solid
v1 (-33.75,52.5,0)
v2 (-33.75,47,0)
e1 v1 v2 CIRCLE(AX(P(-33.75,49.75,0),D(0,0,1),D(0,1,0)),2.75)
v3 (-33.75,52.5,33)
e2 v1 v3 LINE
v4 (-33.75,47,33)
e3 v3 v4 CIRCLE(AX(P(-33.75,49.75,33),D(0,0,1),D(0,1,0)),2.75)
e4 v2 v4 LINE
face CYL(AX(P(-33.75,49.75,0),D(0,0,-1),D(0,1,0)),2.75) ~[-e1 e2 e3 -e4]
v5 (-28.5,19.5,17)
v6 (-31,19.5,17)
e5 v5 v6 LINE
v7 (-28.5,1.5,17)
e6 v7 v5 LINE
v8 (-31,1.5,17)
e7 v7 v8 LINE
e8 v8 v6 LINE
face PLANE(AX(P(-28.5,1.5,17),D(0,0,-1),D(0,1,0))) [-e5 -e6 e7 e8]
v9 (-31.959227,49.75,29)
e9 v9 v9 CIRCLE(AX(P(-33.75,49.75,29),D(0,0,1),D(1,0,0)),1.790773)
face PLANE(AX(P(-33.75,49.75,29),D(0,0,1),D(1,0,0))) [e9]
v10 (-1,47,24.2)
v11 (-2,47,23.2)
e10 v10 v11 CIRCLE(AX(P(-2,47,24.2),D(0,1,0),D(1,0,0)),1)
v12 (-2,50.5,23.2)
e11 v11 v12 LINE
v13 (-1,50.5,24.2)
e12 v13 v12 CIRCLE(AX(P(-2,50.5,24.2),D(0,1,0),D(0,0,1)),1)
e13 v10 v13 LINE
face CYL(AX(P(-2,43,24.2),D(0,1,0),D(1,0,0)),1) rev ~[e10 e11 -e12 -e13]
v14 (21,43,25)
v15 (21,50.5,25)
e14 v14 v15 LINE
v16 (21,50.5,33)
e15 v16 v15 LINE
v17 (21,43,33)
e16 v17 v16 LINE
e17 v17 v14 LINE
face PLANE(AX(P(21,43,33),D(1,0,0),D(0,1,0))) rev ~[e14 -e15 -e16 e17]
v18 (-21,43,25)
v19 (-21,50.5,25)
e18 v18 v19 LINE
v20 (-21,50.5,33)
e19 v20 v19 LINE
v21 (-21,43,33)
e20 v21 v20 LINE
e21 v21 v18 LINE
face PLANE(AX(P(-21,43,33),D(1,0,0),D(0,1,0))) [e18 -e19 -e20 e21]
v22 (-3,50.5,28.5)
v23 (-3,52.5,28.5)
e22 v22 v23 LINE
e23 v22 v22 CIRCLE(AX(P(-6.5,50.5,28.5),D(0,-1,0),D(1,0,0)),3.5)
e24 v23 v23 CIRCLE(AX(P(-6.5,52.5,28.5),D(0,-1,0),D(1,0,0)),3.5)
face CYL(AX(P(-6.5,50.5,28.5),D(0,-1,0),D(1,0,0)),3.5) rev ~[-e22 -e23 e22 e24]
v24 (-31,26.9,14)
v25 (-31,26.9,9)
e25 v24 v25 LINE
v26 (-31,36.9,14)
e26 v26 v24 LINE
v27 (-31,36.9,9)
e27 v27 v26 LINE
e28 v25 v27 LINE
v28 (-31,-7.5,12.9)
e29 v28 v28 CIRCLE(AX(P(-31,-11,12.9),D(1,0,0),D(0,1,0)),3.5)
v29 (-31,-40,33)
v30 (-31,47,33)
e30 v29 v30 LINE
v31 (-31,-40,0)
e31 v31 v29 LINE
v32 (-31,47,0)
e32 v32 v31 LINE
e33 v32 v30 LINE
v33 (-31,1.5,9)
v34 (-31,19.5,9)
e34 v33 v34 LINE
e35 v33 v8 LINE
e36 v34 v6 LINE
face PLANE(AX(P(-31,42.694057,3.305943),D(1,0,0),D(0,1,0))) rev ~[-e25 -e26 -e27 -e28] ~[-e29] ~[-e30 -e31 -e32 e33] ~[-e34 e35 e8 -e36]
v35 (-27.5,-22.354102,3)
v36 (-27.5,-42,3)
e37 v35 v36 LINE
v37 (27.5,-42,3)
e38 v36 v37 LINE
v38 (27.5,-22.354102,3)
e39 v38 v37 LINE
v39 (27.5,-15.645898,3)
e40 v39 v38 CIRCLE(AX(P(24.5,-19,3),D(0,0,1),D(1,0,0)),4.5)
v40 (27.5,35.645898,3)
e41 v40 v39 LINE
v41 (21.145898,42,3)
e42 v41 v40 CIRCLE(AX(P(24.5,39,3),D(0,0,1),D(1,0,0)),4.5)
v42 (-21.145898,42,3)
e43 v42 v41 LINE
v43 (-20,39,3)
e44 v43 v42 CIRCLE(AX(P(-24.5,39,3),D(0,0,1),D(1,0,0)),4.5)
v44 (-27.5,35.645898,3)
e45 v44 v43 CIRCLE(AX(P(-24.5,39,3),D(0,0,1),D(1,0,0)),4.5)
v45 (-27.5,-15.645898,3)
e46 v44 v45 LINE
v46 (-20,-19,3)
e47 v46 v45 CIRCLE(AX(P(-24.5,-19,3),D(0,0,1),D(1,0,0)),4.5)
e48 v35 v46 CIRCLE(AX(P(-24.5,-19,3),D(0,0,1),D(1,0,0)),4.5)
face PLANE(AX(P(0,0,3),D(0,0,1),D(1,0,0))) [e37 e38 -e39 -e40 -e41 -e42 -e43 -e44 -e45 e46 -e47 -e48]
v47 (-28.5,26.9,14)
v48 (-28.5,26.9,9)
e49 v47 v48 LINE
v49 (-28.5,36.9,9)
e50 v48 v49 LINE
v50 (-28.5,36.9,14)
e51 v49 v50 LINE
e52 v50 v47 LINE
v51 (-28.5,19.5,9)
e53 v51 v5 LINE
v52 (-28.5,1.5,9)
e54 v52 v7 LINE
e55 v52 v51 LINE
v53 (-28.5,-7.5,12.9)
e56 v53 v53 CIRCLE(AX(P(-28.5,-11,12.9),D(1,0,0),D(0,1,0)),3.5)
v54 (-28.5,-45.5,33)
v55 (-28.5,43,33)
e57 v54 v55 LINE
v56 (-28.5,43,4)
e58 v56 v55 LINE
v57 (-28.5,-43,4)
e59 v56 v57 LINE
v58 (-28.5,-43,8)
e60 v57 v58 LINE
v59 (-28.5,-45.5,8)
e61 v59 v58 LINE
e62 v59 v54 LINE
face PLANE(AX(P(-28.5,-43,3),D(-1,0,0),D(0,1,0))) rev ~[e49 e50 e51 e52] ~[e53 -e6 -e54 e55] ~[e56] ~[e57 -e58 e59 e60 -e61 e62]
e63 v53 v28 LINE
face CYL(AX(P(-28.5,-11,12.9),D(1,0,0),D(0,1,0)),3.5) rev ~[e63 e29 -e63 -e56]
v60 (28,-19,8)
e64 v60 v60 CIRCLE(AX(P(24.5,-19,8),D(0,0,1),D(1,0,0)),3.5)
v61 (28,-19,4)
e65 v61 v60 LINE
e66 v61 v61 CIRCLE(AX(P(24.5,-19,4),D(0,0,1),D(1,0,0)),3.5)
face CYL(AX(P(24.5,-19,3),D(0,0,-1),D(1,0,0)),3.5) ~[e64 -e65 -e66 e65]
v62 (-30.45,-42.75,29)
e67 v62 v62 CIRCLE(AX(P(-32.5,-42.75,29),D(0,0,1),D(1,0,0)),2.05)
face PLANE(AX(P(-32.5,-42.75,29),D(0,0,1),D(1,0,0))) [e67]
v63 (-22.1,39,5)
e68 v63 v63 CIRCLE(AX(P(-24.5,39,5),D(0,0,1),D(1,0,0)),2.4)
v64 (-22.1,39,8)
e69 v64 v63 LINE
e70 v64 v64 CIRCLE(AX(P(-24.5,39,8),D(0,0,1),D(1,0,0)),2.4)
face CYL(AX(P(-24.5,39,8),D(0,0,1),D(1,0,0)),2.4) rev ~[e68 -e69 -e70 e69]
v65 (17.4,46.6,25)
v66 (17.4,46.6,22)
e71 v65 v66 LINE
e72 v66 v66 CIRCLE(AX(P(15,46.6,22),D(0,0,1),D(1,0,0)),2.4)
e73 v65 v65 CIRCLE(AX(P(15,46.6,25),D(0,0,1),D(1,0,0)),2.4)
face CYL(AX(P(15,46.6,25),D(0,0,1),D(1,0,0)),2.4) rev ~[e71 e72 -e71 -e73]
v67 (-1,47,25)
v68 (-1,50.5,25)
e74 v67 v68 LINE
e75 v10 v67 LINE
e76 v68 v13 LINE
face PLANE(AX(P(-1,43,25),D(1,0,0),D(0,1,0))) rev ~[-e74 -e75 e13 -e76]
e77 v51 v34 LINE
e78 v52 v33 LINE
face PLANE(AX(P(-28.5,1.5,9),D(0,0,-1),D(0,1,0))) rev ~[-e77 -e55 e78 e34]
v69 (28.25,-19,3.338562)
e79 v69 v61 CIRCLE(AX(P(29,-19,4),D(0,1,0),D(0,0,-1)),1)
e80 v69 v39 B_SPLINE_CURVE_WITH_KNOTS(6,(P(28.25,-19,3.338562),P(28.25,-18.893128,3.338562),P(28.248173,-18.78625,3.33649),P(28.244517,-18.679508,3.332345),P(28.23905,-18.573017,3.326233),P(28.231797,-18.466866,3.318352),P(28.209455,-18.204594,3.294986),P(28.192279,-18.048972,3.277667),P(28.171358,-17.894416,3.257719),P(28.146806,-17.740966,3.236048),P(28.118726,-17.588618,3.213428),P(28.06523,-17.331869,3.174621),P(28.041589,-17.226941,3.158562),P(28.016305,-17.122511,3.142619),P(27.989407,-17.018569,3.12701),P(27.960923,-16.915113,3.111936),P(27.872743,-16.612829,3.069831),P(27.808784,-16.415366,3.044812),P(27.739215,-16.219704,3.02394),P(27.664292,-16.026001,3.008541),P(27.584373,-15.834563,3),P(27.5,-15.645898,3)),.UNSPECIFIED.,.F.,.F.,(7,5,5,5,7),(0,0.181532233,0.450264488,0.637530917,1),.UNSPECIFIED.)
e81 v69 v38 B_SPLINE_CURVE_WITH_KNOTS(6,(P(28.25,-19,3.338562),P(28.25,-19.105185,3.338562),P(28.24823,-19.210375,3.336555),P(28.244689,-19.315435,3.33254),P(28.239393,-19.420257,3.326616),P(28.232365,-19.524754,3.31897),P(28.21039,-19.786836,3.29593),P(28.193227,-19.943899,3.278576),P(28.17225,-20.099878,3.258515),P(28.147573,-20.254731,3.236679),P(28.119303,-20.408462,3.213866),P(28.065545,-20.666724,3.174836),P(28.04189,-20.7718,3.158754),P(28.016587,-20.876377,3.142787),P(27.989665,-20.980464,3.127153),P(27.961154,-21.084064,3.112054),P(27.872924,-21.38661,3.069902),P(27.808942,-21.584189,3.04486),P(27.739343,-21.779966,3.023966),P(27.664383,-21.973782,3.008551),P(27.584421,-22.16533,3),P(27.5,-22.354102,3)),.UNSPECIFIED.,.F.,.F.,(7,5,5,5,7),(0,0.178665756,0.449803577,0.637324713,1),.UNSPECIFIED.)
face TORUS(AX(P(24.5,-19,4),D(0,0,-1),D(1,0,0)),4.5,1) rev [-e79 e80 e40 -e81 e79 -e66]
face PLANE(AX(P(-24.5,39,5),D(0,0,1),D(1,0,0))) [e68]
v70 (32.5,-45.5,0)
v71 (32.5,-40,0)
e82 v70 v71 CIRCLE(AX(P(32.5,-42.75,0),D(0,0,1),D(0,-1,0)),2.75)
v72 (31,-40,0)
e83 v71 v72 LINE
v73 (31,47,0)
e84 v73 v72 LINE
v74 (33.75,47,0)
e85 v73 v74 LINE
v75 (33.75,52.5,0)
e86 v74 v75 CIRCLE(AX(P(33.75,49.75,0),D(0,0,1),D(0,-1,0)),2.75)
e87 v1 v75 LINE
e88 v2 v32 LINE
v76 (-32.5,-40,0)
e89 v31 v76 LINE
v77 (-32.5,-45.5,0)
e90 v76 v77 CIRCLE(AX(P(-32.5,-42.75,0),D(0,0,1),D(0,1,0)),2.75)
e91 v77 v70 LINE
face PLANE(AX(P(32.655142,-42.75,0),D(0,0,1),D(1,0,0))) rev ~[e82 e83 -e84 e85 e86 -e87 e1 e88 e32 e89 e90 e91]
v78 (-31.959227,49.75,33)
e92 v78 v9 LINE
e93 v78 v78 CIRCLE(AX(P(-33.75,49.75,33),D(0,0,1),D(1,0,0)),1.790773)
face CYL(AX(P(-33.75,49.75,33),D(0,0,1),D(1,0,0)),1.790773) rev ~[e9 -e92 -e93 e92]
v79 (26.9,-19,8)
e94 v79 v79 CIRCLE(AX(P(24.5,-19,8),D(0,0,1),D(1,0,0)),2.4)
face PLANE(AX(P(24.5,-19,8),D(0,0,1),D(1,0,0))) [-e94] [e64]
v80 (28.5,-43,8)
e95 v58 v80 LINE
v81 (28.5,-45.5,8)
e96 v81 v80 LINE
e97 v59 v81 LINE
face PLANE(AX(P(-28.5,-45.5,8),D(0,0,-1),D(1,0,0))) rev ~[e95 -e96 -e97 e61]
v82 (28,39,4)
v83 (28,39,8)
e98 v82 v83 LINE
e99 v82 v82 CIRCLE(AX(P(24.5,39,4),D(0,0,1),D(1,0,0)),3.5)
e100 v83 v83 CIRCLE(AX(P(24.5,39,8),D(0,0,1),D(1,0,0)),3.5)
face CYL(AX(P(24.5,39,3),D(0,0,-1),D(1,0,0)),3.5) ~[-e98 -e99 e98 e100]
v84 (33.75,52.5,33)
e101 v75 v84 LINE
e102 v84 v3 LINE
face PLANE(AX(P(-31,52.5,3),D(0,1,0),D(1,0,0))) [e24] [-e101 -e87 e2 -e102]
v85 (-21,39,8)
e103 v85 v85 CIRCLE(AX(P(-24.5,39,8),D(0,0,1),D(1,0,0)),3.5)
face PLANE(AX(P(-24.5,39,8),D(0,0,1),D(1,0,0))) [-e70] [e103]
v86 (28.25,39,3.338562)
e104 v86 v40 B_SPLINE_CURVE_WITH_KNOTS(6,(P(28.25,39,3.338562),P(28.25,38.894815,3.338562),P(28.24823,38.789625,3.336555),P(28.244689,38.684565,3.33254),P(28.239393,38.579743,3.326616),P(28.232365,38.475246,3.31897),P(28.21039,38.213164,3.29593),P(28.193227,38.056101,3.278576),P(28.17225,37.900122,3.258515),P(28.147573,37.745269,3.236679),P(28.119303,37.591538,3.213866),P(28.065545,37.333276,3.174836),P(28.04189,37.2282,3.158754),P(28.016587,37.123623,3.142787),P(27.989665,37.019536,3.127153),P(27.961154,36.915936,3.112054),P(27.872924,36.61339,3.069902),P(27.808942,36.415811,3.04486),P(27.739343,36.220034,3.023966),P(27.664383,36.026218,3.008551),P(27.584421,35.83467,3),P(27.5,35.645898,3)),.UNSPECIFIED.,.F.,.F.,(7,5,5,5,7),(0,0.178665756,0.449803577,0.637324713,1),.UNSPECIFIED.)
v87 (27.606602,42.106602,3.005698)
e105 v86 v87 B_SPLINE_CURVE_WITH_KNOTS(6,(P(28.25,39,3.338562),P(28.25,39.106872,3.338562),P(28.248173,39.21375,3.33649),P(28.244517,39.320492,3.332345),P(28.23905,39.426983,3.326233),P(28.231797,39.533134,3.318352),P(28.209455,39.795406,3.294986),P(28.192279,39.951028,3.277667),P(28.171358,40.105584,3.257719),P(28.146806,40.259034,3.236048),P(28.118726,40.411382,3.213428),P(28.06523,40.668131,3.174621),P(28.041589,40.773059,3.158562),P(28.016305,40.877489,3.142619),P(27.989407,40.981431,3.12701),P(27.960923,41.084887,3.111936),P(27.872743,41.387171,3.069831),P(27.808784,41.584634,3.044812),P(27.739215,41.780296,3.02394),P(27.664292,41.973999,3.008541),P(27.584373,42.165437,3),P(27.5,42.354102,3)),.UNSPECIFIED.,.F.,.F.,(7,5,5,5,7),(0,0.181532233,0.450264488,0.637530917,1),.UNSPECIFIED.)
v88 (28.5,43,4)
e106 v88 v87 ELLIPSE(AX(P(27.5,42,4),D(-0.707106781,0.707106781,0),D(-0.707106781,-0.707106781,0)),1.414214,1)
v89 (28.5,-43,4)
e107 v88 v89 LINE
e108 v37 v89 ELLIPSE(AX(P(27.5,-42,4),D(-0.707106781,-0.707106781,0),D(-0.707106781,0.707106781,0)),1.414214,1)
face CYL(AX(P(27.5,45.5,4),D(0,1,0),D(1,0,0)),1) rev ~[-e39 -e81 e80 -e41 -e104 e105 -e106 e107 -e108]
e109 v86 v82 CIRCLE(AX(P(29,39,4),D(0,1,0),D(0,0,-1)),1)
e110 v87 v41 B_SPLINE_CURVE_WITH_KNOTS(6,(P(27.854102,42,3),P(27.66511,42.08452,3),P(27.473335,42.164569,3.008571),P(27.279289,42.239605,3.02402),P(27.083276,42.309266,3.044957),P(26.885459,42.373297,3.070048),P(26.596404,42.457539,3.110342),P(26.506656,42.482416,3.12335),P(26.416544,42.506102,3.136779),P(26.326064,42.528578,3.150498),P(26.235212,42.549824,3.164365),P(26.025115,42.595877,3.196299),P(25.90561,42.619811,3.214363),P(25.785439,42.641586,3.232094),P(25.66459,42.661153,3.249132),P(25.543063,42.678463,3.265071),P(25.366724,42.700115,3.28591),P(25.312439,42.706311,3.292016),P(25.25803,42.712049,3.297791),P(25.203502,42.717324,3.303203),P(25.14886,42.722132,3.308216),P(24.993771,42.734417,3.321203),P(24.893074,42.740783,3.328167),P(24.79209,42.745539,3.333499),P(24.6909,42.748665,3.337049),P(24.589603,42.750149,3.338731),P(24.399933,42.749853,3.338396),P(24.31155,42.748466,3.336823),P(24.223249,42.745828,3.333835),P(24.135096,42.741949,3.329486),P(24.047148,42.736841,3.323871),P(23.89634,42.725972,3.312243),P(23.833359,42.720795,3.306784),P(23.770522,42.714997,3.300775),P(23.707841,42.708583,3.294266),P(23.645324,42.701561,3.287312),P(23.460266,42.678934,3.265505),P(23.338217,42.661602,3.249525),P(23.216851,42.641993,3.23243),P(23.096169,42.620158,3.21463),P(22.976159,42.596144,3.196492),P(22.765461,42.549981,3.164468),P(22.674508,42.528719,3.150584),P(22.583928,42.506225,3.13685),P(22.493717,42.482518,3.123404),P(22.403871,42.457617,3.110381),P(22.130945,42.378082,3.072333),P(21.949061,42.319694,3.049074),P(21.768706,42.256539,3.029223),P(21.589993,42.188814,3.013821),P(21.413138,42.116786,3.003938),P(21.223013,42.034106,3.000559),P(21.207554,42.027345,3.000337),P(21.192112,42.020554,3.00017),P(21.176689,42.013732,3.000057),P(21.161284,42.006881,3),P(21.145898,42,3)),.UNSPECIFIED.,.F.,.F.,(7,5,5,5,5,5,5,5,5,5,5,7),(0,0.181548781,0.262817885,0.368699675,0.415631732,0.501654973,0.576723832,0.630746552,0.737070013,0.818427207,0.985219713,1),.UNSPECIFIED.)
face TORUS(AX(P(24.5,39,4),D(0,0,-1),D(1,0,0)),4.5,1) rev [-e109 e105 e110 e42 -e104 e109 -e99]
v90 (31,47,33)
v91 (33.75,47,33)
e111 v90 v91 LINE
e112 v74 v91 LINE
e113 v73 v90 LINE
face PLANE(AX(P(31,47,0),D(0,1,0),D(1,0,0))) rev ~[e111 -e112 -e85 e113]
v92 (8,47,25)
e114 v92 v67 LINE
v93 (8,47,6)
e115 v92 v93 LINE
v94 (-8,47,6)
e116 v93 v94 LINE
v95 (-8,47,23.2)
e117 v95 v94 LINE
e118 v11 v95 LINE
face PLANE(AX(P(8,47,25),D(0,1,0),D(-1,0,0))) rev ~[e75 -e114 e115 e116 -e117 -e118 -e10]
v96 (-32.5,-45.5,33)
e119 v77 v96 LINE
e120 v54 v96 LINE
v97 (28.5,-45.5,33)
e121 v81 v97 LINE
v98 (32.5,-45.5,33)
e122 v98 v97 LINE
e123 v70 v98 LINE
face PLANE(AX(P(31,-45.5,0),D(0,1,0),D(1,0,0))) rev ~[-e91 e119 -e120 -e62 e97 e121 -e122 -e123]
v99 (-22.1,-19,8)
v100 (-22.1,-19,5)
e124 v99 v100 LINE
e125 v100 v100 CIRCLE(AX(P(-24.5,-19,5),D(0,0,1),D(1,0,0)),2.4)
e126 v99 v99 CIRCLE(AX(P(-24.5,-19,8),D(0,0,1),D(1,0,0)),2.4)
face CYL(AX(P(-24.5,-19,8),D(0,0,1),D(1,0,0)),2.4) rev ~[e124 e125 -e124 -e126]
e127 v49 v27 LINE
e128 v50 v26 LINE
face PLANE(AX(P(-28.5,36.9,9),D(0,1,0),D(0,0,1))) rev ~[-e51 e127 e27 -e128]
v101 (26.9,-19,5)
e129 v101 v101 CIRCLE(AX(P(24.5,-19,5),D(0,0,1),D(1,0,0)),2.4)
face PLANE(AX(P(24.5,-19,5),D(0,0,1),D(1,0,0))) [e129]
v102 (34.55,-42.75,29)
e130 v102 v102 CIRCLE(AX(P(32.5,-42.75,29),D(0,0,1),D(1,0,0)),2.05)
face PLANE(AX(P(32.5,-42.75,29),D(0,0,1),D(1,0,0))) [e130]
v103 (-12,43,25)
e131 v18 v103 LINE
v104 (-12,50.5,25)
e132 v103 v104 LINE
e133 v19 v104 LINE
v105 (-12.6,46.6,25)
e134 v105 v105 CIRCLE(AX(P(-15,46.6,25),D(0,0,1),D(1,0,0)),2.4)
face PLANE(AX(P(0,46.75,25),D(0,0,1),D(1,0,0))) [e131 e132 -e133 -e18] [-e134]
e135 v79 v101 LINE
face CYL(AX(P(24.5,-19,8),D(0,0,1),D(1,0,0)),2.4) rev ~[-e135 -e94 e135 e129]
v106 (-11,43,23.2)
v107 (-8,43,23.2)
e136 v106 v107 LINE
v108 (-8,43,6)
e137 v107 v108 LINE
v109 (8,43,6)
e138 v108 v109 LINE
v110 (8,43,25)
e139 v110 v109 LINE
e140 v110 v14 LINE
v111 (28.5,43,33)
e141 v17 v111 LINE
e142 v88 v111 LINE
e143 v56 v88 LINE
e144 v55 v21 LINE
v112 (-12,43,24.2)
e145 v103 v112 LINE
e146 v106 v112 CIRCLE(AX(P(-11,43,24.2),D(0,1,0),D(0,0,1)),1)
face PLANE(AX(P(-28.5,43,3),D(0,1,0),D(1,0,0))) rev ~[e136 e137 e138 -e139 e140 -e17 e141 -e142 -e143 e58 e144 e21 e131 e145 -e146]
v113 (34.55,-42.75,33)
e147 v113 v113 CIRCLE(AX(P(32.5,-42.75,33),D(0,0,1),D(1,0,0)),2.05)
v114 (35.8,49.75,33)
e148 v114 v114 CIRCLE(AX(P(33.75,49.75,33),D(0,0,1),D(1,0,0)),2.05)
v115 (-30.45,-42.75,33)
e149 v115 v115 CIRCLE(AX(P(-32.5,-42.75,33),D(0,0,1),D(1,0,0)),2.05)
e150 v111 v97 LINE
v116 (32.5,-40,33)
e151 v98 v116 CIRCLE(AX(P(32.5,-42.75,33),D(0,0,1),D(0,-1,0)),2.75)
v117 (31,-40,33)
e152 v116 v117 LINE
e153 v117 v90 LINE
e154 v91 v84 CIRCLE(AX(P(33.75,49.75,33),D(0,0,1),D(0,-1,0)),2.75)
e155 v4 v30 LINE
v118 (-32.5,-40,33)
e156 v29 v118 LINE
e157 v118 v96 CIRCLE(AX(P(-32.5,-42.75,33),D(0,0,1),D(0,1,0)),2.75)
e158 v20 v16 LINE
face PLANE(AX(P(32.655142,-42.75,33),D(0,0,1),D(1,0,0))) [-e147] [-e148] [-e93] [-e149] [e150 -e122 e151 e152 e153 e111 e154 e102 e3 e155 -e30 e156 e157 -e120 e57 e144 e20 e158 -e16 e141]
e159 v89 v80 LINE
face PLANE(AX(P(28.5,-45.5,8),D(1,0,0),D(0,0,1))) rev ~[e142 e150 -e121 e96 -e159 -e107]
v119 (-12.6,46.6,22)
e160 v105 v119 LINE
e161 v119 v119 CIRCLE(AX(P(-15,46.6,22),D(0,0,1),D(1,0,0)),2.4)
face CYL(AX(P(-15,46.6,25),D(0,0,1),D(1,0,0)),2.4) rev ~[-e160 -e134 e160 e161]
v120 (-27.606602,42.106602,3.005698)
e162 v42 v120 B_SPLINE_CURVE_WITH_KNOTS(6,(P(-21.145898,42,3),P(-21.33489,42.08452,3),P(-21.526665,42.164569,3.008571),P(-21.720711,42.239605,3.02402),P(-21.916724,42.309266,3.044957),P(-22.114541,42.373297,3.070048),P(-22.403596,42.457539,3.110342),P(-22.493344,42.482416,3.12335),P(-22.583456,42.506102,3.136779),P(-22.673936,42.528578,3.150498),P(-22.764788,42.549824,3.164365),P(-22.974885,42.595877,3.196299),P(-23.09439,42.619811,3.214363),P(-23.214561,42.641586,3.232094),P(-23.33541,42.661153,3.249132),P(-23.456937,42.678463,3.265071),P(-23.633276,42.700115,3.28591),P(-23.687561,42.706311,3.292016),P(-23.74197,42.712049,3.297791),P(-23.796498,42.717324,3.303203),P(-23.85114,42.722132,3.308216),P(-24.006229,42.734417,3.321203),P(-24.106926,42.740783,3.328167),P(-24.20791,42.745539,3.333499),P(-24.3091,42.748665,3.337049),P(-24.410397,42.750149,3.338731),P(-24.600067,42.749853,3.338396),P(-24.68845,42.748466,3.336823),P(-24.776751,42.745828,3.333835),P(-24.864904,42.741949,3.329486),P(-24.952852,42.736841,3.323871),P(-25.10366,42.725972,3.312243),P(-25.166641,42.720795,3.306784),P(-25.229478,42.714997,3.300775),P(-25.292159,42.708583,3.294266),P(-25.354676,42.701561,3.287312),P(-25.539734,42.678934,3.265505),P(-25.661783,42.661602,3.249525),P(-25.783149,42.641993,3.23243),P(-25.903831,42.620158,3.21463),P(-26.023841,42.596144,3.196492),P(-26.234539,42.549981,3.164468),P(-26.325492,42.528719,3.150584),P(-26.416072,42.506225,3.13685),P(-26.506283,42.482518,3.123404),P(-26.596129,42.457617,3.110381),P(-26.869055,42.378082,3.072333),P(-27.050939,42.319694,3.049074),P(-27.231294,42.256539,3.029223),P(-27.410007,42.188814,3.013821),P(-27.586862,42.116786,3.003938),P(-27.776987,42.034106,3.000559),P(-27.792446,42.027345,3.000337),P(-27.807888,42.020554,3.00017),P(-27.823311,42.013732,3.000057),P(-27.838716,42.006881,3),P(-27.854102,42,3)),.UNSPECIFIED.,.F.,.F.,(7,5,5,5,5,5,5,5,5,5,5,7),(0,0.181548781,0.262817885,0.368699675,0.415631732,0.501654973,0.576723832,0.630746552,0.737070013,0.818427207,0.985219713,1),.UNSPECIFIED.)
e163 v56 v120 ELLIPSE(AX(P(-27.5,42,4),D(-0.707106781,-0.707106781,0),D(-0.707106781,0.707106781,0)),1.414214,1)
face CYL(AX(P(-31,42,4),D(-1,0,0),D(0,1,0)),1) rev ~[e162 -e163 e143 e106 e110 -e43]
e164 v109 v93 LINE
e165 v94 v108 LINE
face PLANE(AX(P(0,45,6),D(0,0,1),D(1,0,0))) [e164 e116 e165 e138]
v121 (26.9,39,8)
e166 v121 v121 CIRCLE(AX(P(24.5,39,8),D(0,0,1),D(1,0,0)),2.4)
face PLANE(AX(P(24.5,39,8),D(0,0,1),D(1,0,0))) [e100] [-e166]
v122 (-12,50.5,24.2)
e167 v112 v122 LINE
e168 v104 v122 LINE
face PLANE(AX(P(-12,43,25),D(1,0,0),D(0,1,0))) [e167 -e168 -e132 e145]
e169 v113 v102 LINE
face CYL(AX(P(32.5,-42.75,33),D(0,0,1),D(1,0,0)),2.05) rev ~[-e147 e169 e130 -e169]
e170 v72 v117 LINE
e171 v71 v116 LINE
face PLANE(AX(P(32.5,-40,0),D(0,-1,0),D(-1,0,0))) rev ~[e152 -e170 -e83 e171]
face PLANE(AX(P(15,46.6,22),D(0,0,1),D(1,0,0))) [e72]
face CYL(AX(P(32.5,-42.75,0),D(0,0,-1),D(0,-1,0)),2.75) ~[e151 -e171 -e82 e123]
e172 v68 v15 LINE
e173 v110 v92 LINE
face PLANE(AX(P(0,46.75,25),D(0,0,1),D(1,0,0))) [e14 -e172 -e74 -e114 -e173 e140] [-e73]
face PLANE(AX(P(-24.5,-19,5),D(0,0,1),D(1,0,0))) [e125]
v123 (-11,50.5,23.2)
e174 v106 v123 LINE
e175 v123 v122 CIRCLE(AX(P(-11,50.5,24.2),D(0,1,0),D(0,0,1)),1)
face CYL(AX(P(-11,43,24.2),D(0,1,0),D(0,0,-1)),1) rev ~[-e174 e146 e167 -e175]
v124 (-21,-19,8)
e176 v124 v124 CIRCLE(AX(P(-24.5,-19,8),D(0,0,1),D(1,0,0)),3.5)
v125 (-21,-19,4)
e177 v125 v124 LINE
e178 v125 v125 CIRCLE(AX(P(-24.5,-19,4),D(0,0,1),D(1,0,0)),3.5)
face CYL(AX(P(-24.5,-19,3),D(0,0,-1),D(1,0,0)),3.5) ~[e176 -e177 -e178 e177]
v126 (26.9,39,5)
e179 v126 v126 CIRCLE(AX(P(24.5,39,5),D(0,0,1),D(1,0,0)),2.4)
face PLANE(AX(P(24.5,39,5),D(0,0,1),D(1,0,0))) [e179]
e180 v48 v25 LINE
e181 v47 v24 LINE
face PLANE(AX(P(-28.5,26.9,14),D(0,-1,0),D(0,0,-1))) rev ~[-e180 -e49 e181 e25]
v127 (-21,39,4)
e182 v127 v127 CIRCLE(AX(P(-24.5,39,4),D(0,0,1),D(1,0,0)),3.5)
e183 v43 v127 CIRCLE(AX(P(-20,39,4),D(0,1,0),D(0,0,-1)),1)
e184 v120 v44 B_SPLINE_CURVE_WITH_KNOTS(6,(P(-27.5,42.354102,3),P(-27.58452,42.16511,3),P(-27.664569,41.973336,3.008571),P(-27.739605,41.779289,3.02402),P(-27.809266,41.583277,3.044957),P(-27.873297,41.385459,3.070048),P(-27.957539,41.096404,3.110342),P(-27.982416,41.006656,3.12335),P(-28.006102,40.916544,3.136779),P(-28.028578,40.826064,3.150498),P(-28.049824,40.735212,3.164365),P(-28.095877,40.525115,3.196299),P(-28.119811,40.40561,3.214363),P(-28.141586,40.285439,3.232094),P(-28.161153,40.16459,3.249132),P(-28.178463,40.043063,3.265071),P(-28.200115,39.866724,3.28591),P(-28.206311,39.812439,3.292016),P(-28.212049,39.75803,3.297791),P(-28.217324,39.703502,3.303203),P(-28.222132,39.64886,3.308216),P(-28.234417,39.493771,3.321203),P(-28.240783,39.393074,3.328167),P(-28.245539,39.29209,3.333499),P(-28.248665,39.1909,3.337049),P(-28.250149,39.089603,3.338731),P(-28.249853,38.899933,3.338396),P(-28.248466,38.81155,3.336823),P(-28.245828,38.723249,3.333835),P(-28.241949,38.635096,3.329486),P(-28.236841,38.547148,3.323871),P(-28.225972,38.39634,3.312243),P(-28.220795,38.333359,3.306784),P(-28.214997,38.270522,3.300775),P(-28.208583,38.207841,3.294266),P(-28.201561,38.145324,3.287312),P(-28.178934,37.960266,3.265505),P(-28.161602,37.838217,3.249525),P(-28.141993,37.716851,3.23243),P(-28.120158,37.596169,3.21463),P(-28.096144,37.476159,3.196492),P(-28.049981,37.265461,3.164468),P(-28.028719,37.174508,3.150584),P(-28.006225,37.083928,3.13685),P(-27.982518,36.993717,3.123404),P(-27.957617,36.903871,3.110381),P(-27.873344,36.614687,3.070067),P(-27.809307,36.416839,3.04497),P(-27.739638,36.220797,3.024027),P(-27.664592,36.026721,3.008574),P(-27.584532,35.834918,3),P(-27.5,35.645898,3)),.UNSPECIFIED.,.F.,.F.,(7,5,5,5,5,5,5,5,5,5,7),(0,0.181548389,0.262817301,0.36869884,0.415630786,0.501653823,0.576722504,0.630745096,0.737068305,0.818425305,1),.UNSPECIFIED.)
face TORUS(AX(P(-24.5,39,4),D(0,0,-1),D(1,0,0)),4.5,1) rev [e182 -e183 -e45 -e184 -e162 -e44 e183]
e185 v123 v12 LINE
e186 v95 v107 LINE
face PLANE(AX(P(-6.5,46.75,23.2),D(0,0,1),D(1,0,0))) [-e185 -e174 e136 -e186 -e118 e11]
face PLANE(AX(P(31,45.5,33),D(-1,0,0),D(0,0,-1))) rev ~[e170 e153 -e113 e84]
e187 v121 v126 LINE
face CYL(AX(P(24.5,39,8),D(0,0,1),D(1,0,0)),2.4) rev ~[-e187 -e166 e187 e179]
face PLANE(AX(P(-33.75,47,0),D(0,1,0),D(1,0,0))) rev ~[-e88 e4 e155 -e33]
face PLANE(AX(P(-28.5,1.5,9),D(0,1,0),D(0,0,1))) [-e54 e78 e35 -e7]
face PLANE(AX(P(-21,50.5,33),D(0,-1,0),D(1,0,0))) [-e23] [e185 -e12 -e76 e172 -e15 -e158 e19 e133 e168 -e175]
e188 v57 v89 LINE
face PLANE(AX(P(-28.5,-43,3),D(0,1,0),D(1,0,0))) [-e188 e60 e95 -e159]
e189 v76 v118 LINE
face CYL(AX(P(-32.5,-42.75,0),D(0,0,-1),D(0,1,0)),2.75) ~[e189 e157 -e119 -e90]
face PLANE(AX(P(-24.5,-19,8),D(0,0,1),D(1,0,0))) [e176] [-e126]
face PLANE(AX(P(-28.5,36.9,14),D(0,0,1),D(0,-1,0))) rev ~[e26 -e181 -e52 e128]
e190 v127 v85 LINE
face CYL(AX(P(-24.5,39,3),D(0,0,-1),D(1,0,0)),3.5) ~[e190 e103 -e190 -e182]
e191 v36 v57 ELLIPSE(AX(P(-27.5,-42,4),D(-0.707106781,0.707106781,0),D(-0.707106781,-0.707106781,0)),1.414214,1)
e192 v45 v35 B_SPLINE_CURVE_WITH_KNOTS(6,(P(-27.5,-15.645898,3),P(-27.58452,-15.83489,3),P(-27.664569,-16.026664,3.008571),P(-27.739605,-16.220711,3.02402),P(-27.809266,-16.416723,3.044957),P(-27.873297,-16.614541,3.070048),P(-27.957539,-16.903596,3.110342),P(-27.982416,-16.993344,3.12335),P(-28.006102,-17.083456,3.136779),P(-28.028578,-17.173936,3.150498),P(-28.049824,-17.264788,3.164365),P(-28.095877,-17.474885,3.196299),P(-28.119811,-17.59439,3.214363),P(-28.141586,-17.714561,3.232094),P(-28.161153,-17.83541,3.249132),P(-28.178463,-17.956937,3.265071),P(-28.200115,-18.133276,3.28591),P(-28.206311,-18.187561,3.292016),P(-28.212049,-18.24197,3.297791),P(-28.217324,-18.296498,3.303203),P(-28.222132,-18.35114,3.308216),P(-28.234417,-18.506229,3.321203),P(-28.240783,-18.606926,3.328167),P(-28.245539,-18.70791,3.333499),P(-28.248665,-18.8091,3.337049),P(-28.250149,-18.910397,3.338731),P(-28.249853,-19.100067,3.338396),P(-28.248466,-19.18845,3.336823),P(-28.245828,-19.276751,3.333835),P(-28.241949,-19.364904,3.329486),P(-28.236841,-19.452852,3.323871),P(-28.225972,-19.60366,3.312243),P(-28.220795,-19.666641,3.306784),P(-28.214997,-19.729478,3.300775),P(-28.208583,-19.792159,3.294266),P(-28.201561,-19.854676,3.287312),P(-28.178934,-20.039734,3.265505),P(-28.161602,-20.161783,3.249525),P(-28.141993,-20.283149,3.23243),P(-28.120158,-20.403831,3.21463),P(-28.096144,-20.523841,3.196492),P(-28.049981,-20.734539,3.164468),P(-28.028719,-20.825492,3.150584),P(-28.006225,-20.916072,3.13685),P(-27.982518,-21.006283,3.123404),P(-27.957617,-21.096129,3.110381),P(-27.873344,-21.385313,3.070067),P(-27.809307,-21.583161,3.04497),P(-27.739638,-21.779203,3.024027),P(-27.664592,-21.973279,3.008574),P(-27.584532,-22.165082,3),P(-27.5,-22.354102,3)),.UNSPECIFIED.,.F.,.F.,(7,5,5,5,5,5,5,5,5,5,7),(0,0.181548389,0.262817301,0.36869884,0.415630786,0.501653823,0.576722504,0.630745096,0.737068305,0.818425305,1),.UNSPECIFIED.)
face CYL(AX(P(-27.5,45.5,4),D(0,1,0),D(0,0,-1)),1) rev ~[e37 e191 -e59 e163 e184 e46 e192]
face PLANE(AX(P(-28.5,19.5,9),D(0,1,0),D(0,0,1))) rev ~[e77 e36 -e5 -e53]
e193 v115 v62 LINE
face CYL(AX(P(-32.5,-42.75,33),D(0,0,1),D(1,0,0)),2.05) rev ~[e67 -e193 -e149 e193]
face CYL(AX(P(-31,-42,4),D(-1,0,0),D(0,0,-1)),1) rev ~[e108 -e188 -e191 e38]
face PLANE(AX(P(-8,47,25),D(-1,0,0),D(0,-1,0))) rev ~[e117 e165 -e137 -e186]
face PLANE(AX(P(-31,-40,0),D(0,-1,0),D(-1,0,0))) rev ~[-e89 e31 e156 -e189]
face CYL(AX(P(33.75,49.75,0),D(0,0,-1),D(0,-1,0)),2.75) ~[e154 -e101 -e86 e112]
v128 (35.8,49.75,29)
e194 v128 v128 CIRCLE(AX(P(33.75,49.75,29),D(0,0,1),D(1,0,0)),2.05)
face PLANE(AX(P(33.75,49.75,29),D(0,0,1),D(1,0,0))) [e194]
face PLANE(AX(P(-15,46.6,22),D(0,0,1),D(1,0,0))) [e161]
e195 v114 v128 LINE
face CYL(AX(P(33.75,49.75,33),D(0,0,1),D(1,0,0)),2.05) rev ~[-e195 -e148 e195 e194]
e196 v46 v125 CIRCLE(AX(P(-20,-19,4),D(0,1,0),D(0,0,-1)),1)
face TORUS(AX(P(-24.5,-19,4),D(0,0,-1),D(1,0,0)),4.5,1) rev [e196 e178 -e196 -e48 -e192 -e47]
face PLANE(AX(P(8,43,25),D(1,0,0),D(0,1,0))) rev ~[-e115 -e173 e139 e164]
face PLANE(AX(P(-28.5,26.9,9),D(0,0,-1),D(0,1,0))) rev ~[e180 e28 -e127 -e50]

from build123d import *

# Parameters (mm, degrees)
F0_W         = 62
F0_H         = 91
F1_DEPTH     = 3
F2_W         = 62
F2_H         = 91
F2_W_2       = 57
F2_H_2       = 86
F3_DEPTH     = 30
F4_R         = 3.5
F5_DEPTH     = 5
F6_R         = 2.4
F7_DEPTH     = 3
F8_W         = 57
F8_H         = 25
F9_DEPTH     = 2.5
F10_W        = 18
F10_H        = 8
F10_R        = 3.5
F11_DEPTH    = 2.5
F12_DEPTH    = 7
F13_W        = 42
F13_H        = 7.5
F14_DEPTH    = 8
F15_R        = 2.4
F16_DEPTH    = 3
F17_W        = 11
F17_H        = 7.5
F18_DEPTH    = 1.8
F19_R        = 1
F20_R        = 3.5
F21_DEPTH    = 2
F22_T1_DEPTH = 62
F22_T3_DEPTH = 91
F24_DEPTH    = 33
F25_R        = 2.05
F25_R_2      = 1.7907732373
F26_DEPTH    = 4
F28_DEPTH    = 19


# Not quite as in the source:
# - a fillet or chamfer that OpenCascade refuses, or shapes differently, is made with other operations: its cross-section is extruded or revolved along the edge and cut away or added


with BuildPart() as f1:
    # F0 (on Top) → F1 (new body)
    with BuildSketch(Plane.XY):
        Rectangle(F0_W, F0_H)
    extrude(amount=F1_DEPTH)

    # F2 (on face) → F3 (join)
    with BuildSketch(Plane.XY.offset(3)):
        Rectangle(F2_W, F2_H)
        Rectangle(F2_W_2, F2_H_2, mode=Mode.SUBTRACT)
    extrude(amount=F3_DEPTH)

    # F4 (on face) → F5 (join)
    with BuildSketch(Plane.XY.offset(3)):
        with Locations((-24.5, 39)):
            Circle(F4_R)
        with Locations((24.5, 39)):
            Circle(F4_R)
        with Locations((-24.5, -19)):
            Circle(F4_R)
        with Locations((24.5, -19)):
            Circle(F4_R)
    extrude(amount=F5_DEPTH)

    # F6 (on face) → F7 (cut)
    with BuildSketch(Plane.XY.offset(8)):
        with Locations((-24.5, 39)):
            Circle(F6_R)
        with Locations((24.5, 39)):
            Circle(F6_R)
        with Locations((-24.5, -19)):
            Circle(F6_R)
        with Locations((24.5, -19)):
            Circle(F6_R)
    extrude(amount=-F7_DEPTH, mode=Mode.SUBTRACT)

    # F8 (on face) → F9 (cut, through all)
    with BuildSketch(Plane.XZ.offset(45.5)):
        with Locations((0, 20.5)):
            Rectangle(F8_W, F8_H)
    extrude(amount=-F9_DEPTH, mode=Mode.SUBTRACT)

    # F10 (on face) → F11 (cut, through all)
    with BuildSketch(Plane.YZ.offset(-28.5)):
        Polygon((26.9, 9), (36.9, 9), (36.9, 14), (31.9, 14), (26.9, 14), align=None)
        with Locations((10.5, 13)):
            Rectangle(F10_W, F10_H)
        with Locations((-11, 12.9)):
            Circle(F10_R)
    extrude(amount=-F11_DEPTH, mode=Mode.SUBTRACT)

    # F12 (add): a face of the model
    f12_faces = [f1.faces().sort_by_distance(p)[0] for p in [
        (0, 45.5, 16.5),
    ]]
    extrude(f12_faces, amount=F12_DEPTH)

    # F13 (on face) → F14 (cut)
    with BuildSketch(Plane.XY.offset(33)):
        with Locations((0, 46.75)):
            Rectangle(F13_W, F13_H)
    extrude(amount=-F14_DEPTH, mode=Mode.SUBTRACT)

    # F15 (on face) → F16 (cut)
    with BuildSketch(Plane.XY.offset(25)):
        with Locations((-15, 46.6)):
            Circle(F15_R)
        with Locations((15, 46.6)):
            Circle(F15_R)
    extrude(amount=-F16_DEPTH, mode=Mode.SUBTRACT)

    # F17 (on face) → F18 (cut)
    with BuildSketch(Plane.XY.offset(25)):
        with Locations((-6.5, 46.75)):
            Rectangle(F17_W, F17_H)
    extrude(amount=-F18_DEPTH, mode=Mode.SUBTRACT)

    # F19
    f19_edges = [f1.edges().sort_by_distance(p)[0] for p in [
        (-12, 46.75, 23.2),
        (-1, 46.75, 23.2),
    ]]
    fillet(f19_edges, radius=F19_R)

    # F20 (on face) → F21 (cut, through all)
    with BuildSketch(Plane.XZ.offset(-50.5)):
        with Locations((-6.5, 28.5)):
            Circle(F20_R)
    extrude(amount=-F21_DEPTH, mode=Mode.SUBTRACT)

    # F22: fillet of radius 1 on 8 edges, made by hand

    # F22_s2 → F22_t1 (join)
    with BuildSketch(Plane.YZ.offset(-31)):
        with BuildLine():
            ThreePointArc((43, 4), (42.7071067812, 3.2928932188), (42, 3))
            Line((42, 3), (43, 3))
            Line((43, 3), (43, 4))
        make_face()
        with BuildLine():
            ThreePointArc((-42, 3), (-42.7071067812, 3.2928932188), (-43, 4))
            Line((-43, 4), (-43, 3))
            Line((-43, 3), (-42, 3))
        make_face()
    extrude(amount=F22_T1_DEPTH)

    # F22_s4 → F22_t3 (join)
    with BuildSketch(Plane.XZ.offset(-45.5)):
        with BuildLine():
            ThreePointArc((-27.5, 3), (-28.2071067812, 3.2928932188), (-28.5, 4))
            Line((-28.5, 4), (-28.5, 3))
            Line((-28.5, 3), (-27.5, 3))
        make_face()
        with BuildLine():
            ThreePointArc((28.5, 4), (28.2071067812, 3.2928932188), (27.5, 3))
            Line((27.5, 3), (28.5, 3))
            Line((28.5, 3), (28.5, 4))
        make_face()
    extrude(amount=F22_T3_DEPTH)

    # F22_s5 → F22_t6 (revolve)
    with BuildSketch(Plane.XZ.offset(-39)):
        with BuildLine():
            ThreePointArc((29, 3), (28.2928932188, 3.2928932188), (28, 4))
            Line((28, 4), (28, 3))
            Line((28, 3), (29, 3))
        make_face()
    revolve(axis=Axis((24.5, 39, 3), (0, 0, 1)))

    # F22_s7 → F22_t8 (revolve)
    with BuildSketch(Plane.XZ.offset(-39)):
        with BuildLine():
            ThreePointArc((-20, 3), (-20.7071067812, 3.2928932188), (-21, 4))
            Line((-21, 4), (-21, 3))
            Line((-21, 3), (-20, 3))
        make_face()
    revolve(axis=Axis((-24.5, 39, 3), (0, 0, 1)))

    # F22_s9 → F22_t10 (revolve)
    with BuildSketch(Plane.XZ.offset(19)):
        with BuildLine():
            ThreePointArc((-20, 3), (-20.7071067812, 3.2928932188), (-21, 4))
            Line((-21, 4), (-21, 3))
            Line((-21, 3), (-20, 3))
        make_face()
    revolve(axis=Axis((-24.5, -19, 3), (0, 0, 1)))

    # F22_s11 → F22_t12 (revolve)
    with BuildSketch(Plane.XZ.offset(19)):
        with BuildLine():
            ThreePointArc((29, 3), (28.2928932188, 3.2928932188), (28, 4))
            Line((28, 4), (28, 3))
            Line((28, 3), (29, 3))
        make_face()
    revolve(axis=Axis((24.5, -19, 3), (0, 0, 1)))

    # F23 (on face) → F24 (join, through all)
    with BuildSketch(Plane.XY):
        with BuildLine():
            Line((31, -45.5), (32.5, -45.5))
            ThreePointArc((32.5, -45.5), (35.25, -42.75), (32.5, -40))
            Line((32.5, -40), (31, -40))
            Line((31, -40), (31, -45.5))
        make_face()
        with BuildLine():
            Line((-31, -40), (-32.5, -40))
            ThreePointArc((-32.5, -40), (-35.25, -42.75), (-32.5, -45.5))
            Line((-32.5, -45.5), (-31, -45.5))
            Line((-31, -45.5), (-31, -40))
        make_face()
        with BuildLine():
            Line((-31, 52.5), (-33.75, 52.5))
            ThreePointArc((-33.75, 52.5), (-36.5, 49.75), (-33.75, 47))
            Line((-33.75, 47), (-31, 47))
            Line((-31, 47), (-31, 52.5))
        make_face()
        with BuildLine():
            Line((31, 47), (33.75, 47))
            ThreePointArc((33.75, 47), (36.5, 49.75), (33.75, 52.5))
            Line((33.75, 52.5), (31, 52.5))
            Line((31, 52.5), (31, 47))
        make_face()
    extrude(amount=F24_DEPTH)

    # F25 (on face) → F26 (cut)
    with BuildSketch(Plane.XY.offset(33)):
        with Locations((-32.5, -42.75)):
            Circle(F25_R)
        with Locations((32.5, -42.75)):
            Circle(F25_R)
        with Locations((-33.75, 49.75)):
            Circle(F25_R_2)
        with Locations((33.75, 49.75)):
            Circle(F25_R)
    extrude(amount=-F26_DEPTH, mode=Mode.SUBTRACT)

    # F27 (on face) → F28 (cut, through all)
    with BuildSketch(Plane.XY.offset(25)):
        Polygon((-8, 43), (8, 43), (8, 47), (0, 47), (-8, 47), align=None)
    extrude(amount=-F28_DEPTH, mode=Mode.SUBTRACT)


solid = f1.part
